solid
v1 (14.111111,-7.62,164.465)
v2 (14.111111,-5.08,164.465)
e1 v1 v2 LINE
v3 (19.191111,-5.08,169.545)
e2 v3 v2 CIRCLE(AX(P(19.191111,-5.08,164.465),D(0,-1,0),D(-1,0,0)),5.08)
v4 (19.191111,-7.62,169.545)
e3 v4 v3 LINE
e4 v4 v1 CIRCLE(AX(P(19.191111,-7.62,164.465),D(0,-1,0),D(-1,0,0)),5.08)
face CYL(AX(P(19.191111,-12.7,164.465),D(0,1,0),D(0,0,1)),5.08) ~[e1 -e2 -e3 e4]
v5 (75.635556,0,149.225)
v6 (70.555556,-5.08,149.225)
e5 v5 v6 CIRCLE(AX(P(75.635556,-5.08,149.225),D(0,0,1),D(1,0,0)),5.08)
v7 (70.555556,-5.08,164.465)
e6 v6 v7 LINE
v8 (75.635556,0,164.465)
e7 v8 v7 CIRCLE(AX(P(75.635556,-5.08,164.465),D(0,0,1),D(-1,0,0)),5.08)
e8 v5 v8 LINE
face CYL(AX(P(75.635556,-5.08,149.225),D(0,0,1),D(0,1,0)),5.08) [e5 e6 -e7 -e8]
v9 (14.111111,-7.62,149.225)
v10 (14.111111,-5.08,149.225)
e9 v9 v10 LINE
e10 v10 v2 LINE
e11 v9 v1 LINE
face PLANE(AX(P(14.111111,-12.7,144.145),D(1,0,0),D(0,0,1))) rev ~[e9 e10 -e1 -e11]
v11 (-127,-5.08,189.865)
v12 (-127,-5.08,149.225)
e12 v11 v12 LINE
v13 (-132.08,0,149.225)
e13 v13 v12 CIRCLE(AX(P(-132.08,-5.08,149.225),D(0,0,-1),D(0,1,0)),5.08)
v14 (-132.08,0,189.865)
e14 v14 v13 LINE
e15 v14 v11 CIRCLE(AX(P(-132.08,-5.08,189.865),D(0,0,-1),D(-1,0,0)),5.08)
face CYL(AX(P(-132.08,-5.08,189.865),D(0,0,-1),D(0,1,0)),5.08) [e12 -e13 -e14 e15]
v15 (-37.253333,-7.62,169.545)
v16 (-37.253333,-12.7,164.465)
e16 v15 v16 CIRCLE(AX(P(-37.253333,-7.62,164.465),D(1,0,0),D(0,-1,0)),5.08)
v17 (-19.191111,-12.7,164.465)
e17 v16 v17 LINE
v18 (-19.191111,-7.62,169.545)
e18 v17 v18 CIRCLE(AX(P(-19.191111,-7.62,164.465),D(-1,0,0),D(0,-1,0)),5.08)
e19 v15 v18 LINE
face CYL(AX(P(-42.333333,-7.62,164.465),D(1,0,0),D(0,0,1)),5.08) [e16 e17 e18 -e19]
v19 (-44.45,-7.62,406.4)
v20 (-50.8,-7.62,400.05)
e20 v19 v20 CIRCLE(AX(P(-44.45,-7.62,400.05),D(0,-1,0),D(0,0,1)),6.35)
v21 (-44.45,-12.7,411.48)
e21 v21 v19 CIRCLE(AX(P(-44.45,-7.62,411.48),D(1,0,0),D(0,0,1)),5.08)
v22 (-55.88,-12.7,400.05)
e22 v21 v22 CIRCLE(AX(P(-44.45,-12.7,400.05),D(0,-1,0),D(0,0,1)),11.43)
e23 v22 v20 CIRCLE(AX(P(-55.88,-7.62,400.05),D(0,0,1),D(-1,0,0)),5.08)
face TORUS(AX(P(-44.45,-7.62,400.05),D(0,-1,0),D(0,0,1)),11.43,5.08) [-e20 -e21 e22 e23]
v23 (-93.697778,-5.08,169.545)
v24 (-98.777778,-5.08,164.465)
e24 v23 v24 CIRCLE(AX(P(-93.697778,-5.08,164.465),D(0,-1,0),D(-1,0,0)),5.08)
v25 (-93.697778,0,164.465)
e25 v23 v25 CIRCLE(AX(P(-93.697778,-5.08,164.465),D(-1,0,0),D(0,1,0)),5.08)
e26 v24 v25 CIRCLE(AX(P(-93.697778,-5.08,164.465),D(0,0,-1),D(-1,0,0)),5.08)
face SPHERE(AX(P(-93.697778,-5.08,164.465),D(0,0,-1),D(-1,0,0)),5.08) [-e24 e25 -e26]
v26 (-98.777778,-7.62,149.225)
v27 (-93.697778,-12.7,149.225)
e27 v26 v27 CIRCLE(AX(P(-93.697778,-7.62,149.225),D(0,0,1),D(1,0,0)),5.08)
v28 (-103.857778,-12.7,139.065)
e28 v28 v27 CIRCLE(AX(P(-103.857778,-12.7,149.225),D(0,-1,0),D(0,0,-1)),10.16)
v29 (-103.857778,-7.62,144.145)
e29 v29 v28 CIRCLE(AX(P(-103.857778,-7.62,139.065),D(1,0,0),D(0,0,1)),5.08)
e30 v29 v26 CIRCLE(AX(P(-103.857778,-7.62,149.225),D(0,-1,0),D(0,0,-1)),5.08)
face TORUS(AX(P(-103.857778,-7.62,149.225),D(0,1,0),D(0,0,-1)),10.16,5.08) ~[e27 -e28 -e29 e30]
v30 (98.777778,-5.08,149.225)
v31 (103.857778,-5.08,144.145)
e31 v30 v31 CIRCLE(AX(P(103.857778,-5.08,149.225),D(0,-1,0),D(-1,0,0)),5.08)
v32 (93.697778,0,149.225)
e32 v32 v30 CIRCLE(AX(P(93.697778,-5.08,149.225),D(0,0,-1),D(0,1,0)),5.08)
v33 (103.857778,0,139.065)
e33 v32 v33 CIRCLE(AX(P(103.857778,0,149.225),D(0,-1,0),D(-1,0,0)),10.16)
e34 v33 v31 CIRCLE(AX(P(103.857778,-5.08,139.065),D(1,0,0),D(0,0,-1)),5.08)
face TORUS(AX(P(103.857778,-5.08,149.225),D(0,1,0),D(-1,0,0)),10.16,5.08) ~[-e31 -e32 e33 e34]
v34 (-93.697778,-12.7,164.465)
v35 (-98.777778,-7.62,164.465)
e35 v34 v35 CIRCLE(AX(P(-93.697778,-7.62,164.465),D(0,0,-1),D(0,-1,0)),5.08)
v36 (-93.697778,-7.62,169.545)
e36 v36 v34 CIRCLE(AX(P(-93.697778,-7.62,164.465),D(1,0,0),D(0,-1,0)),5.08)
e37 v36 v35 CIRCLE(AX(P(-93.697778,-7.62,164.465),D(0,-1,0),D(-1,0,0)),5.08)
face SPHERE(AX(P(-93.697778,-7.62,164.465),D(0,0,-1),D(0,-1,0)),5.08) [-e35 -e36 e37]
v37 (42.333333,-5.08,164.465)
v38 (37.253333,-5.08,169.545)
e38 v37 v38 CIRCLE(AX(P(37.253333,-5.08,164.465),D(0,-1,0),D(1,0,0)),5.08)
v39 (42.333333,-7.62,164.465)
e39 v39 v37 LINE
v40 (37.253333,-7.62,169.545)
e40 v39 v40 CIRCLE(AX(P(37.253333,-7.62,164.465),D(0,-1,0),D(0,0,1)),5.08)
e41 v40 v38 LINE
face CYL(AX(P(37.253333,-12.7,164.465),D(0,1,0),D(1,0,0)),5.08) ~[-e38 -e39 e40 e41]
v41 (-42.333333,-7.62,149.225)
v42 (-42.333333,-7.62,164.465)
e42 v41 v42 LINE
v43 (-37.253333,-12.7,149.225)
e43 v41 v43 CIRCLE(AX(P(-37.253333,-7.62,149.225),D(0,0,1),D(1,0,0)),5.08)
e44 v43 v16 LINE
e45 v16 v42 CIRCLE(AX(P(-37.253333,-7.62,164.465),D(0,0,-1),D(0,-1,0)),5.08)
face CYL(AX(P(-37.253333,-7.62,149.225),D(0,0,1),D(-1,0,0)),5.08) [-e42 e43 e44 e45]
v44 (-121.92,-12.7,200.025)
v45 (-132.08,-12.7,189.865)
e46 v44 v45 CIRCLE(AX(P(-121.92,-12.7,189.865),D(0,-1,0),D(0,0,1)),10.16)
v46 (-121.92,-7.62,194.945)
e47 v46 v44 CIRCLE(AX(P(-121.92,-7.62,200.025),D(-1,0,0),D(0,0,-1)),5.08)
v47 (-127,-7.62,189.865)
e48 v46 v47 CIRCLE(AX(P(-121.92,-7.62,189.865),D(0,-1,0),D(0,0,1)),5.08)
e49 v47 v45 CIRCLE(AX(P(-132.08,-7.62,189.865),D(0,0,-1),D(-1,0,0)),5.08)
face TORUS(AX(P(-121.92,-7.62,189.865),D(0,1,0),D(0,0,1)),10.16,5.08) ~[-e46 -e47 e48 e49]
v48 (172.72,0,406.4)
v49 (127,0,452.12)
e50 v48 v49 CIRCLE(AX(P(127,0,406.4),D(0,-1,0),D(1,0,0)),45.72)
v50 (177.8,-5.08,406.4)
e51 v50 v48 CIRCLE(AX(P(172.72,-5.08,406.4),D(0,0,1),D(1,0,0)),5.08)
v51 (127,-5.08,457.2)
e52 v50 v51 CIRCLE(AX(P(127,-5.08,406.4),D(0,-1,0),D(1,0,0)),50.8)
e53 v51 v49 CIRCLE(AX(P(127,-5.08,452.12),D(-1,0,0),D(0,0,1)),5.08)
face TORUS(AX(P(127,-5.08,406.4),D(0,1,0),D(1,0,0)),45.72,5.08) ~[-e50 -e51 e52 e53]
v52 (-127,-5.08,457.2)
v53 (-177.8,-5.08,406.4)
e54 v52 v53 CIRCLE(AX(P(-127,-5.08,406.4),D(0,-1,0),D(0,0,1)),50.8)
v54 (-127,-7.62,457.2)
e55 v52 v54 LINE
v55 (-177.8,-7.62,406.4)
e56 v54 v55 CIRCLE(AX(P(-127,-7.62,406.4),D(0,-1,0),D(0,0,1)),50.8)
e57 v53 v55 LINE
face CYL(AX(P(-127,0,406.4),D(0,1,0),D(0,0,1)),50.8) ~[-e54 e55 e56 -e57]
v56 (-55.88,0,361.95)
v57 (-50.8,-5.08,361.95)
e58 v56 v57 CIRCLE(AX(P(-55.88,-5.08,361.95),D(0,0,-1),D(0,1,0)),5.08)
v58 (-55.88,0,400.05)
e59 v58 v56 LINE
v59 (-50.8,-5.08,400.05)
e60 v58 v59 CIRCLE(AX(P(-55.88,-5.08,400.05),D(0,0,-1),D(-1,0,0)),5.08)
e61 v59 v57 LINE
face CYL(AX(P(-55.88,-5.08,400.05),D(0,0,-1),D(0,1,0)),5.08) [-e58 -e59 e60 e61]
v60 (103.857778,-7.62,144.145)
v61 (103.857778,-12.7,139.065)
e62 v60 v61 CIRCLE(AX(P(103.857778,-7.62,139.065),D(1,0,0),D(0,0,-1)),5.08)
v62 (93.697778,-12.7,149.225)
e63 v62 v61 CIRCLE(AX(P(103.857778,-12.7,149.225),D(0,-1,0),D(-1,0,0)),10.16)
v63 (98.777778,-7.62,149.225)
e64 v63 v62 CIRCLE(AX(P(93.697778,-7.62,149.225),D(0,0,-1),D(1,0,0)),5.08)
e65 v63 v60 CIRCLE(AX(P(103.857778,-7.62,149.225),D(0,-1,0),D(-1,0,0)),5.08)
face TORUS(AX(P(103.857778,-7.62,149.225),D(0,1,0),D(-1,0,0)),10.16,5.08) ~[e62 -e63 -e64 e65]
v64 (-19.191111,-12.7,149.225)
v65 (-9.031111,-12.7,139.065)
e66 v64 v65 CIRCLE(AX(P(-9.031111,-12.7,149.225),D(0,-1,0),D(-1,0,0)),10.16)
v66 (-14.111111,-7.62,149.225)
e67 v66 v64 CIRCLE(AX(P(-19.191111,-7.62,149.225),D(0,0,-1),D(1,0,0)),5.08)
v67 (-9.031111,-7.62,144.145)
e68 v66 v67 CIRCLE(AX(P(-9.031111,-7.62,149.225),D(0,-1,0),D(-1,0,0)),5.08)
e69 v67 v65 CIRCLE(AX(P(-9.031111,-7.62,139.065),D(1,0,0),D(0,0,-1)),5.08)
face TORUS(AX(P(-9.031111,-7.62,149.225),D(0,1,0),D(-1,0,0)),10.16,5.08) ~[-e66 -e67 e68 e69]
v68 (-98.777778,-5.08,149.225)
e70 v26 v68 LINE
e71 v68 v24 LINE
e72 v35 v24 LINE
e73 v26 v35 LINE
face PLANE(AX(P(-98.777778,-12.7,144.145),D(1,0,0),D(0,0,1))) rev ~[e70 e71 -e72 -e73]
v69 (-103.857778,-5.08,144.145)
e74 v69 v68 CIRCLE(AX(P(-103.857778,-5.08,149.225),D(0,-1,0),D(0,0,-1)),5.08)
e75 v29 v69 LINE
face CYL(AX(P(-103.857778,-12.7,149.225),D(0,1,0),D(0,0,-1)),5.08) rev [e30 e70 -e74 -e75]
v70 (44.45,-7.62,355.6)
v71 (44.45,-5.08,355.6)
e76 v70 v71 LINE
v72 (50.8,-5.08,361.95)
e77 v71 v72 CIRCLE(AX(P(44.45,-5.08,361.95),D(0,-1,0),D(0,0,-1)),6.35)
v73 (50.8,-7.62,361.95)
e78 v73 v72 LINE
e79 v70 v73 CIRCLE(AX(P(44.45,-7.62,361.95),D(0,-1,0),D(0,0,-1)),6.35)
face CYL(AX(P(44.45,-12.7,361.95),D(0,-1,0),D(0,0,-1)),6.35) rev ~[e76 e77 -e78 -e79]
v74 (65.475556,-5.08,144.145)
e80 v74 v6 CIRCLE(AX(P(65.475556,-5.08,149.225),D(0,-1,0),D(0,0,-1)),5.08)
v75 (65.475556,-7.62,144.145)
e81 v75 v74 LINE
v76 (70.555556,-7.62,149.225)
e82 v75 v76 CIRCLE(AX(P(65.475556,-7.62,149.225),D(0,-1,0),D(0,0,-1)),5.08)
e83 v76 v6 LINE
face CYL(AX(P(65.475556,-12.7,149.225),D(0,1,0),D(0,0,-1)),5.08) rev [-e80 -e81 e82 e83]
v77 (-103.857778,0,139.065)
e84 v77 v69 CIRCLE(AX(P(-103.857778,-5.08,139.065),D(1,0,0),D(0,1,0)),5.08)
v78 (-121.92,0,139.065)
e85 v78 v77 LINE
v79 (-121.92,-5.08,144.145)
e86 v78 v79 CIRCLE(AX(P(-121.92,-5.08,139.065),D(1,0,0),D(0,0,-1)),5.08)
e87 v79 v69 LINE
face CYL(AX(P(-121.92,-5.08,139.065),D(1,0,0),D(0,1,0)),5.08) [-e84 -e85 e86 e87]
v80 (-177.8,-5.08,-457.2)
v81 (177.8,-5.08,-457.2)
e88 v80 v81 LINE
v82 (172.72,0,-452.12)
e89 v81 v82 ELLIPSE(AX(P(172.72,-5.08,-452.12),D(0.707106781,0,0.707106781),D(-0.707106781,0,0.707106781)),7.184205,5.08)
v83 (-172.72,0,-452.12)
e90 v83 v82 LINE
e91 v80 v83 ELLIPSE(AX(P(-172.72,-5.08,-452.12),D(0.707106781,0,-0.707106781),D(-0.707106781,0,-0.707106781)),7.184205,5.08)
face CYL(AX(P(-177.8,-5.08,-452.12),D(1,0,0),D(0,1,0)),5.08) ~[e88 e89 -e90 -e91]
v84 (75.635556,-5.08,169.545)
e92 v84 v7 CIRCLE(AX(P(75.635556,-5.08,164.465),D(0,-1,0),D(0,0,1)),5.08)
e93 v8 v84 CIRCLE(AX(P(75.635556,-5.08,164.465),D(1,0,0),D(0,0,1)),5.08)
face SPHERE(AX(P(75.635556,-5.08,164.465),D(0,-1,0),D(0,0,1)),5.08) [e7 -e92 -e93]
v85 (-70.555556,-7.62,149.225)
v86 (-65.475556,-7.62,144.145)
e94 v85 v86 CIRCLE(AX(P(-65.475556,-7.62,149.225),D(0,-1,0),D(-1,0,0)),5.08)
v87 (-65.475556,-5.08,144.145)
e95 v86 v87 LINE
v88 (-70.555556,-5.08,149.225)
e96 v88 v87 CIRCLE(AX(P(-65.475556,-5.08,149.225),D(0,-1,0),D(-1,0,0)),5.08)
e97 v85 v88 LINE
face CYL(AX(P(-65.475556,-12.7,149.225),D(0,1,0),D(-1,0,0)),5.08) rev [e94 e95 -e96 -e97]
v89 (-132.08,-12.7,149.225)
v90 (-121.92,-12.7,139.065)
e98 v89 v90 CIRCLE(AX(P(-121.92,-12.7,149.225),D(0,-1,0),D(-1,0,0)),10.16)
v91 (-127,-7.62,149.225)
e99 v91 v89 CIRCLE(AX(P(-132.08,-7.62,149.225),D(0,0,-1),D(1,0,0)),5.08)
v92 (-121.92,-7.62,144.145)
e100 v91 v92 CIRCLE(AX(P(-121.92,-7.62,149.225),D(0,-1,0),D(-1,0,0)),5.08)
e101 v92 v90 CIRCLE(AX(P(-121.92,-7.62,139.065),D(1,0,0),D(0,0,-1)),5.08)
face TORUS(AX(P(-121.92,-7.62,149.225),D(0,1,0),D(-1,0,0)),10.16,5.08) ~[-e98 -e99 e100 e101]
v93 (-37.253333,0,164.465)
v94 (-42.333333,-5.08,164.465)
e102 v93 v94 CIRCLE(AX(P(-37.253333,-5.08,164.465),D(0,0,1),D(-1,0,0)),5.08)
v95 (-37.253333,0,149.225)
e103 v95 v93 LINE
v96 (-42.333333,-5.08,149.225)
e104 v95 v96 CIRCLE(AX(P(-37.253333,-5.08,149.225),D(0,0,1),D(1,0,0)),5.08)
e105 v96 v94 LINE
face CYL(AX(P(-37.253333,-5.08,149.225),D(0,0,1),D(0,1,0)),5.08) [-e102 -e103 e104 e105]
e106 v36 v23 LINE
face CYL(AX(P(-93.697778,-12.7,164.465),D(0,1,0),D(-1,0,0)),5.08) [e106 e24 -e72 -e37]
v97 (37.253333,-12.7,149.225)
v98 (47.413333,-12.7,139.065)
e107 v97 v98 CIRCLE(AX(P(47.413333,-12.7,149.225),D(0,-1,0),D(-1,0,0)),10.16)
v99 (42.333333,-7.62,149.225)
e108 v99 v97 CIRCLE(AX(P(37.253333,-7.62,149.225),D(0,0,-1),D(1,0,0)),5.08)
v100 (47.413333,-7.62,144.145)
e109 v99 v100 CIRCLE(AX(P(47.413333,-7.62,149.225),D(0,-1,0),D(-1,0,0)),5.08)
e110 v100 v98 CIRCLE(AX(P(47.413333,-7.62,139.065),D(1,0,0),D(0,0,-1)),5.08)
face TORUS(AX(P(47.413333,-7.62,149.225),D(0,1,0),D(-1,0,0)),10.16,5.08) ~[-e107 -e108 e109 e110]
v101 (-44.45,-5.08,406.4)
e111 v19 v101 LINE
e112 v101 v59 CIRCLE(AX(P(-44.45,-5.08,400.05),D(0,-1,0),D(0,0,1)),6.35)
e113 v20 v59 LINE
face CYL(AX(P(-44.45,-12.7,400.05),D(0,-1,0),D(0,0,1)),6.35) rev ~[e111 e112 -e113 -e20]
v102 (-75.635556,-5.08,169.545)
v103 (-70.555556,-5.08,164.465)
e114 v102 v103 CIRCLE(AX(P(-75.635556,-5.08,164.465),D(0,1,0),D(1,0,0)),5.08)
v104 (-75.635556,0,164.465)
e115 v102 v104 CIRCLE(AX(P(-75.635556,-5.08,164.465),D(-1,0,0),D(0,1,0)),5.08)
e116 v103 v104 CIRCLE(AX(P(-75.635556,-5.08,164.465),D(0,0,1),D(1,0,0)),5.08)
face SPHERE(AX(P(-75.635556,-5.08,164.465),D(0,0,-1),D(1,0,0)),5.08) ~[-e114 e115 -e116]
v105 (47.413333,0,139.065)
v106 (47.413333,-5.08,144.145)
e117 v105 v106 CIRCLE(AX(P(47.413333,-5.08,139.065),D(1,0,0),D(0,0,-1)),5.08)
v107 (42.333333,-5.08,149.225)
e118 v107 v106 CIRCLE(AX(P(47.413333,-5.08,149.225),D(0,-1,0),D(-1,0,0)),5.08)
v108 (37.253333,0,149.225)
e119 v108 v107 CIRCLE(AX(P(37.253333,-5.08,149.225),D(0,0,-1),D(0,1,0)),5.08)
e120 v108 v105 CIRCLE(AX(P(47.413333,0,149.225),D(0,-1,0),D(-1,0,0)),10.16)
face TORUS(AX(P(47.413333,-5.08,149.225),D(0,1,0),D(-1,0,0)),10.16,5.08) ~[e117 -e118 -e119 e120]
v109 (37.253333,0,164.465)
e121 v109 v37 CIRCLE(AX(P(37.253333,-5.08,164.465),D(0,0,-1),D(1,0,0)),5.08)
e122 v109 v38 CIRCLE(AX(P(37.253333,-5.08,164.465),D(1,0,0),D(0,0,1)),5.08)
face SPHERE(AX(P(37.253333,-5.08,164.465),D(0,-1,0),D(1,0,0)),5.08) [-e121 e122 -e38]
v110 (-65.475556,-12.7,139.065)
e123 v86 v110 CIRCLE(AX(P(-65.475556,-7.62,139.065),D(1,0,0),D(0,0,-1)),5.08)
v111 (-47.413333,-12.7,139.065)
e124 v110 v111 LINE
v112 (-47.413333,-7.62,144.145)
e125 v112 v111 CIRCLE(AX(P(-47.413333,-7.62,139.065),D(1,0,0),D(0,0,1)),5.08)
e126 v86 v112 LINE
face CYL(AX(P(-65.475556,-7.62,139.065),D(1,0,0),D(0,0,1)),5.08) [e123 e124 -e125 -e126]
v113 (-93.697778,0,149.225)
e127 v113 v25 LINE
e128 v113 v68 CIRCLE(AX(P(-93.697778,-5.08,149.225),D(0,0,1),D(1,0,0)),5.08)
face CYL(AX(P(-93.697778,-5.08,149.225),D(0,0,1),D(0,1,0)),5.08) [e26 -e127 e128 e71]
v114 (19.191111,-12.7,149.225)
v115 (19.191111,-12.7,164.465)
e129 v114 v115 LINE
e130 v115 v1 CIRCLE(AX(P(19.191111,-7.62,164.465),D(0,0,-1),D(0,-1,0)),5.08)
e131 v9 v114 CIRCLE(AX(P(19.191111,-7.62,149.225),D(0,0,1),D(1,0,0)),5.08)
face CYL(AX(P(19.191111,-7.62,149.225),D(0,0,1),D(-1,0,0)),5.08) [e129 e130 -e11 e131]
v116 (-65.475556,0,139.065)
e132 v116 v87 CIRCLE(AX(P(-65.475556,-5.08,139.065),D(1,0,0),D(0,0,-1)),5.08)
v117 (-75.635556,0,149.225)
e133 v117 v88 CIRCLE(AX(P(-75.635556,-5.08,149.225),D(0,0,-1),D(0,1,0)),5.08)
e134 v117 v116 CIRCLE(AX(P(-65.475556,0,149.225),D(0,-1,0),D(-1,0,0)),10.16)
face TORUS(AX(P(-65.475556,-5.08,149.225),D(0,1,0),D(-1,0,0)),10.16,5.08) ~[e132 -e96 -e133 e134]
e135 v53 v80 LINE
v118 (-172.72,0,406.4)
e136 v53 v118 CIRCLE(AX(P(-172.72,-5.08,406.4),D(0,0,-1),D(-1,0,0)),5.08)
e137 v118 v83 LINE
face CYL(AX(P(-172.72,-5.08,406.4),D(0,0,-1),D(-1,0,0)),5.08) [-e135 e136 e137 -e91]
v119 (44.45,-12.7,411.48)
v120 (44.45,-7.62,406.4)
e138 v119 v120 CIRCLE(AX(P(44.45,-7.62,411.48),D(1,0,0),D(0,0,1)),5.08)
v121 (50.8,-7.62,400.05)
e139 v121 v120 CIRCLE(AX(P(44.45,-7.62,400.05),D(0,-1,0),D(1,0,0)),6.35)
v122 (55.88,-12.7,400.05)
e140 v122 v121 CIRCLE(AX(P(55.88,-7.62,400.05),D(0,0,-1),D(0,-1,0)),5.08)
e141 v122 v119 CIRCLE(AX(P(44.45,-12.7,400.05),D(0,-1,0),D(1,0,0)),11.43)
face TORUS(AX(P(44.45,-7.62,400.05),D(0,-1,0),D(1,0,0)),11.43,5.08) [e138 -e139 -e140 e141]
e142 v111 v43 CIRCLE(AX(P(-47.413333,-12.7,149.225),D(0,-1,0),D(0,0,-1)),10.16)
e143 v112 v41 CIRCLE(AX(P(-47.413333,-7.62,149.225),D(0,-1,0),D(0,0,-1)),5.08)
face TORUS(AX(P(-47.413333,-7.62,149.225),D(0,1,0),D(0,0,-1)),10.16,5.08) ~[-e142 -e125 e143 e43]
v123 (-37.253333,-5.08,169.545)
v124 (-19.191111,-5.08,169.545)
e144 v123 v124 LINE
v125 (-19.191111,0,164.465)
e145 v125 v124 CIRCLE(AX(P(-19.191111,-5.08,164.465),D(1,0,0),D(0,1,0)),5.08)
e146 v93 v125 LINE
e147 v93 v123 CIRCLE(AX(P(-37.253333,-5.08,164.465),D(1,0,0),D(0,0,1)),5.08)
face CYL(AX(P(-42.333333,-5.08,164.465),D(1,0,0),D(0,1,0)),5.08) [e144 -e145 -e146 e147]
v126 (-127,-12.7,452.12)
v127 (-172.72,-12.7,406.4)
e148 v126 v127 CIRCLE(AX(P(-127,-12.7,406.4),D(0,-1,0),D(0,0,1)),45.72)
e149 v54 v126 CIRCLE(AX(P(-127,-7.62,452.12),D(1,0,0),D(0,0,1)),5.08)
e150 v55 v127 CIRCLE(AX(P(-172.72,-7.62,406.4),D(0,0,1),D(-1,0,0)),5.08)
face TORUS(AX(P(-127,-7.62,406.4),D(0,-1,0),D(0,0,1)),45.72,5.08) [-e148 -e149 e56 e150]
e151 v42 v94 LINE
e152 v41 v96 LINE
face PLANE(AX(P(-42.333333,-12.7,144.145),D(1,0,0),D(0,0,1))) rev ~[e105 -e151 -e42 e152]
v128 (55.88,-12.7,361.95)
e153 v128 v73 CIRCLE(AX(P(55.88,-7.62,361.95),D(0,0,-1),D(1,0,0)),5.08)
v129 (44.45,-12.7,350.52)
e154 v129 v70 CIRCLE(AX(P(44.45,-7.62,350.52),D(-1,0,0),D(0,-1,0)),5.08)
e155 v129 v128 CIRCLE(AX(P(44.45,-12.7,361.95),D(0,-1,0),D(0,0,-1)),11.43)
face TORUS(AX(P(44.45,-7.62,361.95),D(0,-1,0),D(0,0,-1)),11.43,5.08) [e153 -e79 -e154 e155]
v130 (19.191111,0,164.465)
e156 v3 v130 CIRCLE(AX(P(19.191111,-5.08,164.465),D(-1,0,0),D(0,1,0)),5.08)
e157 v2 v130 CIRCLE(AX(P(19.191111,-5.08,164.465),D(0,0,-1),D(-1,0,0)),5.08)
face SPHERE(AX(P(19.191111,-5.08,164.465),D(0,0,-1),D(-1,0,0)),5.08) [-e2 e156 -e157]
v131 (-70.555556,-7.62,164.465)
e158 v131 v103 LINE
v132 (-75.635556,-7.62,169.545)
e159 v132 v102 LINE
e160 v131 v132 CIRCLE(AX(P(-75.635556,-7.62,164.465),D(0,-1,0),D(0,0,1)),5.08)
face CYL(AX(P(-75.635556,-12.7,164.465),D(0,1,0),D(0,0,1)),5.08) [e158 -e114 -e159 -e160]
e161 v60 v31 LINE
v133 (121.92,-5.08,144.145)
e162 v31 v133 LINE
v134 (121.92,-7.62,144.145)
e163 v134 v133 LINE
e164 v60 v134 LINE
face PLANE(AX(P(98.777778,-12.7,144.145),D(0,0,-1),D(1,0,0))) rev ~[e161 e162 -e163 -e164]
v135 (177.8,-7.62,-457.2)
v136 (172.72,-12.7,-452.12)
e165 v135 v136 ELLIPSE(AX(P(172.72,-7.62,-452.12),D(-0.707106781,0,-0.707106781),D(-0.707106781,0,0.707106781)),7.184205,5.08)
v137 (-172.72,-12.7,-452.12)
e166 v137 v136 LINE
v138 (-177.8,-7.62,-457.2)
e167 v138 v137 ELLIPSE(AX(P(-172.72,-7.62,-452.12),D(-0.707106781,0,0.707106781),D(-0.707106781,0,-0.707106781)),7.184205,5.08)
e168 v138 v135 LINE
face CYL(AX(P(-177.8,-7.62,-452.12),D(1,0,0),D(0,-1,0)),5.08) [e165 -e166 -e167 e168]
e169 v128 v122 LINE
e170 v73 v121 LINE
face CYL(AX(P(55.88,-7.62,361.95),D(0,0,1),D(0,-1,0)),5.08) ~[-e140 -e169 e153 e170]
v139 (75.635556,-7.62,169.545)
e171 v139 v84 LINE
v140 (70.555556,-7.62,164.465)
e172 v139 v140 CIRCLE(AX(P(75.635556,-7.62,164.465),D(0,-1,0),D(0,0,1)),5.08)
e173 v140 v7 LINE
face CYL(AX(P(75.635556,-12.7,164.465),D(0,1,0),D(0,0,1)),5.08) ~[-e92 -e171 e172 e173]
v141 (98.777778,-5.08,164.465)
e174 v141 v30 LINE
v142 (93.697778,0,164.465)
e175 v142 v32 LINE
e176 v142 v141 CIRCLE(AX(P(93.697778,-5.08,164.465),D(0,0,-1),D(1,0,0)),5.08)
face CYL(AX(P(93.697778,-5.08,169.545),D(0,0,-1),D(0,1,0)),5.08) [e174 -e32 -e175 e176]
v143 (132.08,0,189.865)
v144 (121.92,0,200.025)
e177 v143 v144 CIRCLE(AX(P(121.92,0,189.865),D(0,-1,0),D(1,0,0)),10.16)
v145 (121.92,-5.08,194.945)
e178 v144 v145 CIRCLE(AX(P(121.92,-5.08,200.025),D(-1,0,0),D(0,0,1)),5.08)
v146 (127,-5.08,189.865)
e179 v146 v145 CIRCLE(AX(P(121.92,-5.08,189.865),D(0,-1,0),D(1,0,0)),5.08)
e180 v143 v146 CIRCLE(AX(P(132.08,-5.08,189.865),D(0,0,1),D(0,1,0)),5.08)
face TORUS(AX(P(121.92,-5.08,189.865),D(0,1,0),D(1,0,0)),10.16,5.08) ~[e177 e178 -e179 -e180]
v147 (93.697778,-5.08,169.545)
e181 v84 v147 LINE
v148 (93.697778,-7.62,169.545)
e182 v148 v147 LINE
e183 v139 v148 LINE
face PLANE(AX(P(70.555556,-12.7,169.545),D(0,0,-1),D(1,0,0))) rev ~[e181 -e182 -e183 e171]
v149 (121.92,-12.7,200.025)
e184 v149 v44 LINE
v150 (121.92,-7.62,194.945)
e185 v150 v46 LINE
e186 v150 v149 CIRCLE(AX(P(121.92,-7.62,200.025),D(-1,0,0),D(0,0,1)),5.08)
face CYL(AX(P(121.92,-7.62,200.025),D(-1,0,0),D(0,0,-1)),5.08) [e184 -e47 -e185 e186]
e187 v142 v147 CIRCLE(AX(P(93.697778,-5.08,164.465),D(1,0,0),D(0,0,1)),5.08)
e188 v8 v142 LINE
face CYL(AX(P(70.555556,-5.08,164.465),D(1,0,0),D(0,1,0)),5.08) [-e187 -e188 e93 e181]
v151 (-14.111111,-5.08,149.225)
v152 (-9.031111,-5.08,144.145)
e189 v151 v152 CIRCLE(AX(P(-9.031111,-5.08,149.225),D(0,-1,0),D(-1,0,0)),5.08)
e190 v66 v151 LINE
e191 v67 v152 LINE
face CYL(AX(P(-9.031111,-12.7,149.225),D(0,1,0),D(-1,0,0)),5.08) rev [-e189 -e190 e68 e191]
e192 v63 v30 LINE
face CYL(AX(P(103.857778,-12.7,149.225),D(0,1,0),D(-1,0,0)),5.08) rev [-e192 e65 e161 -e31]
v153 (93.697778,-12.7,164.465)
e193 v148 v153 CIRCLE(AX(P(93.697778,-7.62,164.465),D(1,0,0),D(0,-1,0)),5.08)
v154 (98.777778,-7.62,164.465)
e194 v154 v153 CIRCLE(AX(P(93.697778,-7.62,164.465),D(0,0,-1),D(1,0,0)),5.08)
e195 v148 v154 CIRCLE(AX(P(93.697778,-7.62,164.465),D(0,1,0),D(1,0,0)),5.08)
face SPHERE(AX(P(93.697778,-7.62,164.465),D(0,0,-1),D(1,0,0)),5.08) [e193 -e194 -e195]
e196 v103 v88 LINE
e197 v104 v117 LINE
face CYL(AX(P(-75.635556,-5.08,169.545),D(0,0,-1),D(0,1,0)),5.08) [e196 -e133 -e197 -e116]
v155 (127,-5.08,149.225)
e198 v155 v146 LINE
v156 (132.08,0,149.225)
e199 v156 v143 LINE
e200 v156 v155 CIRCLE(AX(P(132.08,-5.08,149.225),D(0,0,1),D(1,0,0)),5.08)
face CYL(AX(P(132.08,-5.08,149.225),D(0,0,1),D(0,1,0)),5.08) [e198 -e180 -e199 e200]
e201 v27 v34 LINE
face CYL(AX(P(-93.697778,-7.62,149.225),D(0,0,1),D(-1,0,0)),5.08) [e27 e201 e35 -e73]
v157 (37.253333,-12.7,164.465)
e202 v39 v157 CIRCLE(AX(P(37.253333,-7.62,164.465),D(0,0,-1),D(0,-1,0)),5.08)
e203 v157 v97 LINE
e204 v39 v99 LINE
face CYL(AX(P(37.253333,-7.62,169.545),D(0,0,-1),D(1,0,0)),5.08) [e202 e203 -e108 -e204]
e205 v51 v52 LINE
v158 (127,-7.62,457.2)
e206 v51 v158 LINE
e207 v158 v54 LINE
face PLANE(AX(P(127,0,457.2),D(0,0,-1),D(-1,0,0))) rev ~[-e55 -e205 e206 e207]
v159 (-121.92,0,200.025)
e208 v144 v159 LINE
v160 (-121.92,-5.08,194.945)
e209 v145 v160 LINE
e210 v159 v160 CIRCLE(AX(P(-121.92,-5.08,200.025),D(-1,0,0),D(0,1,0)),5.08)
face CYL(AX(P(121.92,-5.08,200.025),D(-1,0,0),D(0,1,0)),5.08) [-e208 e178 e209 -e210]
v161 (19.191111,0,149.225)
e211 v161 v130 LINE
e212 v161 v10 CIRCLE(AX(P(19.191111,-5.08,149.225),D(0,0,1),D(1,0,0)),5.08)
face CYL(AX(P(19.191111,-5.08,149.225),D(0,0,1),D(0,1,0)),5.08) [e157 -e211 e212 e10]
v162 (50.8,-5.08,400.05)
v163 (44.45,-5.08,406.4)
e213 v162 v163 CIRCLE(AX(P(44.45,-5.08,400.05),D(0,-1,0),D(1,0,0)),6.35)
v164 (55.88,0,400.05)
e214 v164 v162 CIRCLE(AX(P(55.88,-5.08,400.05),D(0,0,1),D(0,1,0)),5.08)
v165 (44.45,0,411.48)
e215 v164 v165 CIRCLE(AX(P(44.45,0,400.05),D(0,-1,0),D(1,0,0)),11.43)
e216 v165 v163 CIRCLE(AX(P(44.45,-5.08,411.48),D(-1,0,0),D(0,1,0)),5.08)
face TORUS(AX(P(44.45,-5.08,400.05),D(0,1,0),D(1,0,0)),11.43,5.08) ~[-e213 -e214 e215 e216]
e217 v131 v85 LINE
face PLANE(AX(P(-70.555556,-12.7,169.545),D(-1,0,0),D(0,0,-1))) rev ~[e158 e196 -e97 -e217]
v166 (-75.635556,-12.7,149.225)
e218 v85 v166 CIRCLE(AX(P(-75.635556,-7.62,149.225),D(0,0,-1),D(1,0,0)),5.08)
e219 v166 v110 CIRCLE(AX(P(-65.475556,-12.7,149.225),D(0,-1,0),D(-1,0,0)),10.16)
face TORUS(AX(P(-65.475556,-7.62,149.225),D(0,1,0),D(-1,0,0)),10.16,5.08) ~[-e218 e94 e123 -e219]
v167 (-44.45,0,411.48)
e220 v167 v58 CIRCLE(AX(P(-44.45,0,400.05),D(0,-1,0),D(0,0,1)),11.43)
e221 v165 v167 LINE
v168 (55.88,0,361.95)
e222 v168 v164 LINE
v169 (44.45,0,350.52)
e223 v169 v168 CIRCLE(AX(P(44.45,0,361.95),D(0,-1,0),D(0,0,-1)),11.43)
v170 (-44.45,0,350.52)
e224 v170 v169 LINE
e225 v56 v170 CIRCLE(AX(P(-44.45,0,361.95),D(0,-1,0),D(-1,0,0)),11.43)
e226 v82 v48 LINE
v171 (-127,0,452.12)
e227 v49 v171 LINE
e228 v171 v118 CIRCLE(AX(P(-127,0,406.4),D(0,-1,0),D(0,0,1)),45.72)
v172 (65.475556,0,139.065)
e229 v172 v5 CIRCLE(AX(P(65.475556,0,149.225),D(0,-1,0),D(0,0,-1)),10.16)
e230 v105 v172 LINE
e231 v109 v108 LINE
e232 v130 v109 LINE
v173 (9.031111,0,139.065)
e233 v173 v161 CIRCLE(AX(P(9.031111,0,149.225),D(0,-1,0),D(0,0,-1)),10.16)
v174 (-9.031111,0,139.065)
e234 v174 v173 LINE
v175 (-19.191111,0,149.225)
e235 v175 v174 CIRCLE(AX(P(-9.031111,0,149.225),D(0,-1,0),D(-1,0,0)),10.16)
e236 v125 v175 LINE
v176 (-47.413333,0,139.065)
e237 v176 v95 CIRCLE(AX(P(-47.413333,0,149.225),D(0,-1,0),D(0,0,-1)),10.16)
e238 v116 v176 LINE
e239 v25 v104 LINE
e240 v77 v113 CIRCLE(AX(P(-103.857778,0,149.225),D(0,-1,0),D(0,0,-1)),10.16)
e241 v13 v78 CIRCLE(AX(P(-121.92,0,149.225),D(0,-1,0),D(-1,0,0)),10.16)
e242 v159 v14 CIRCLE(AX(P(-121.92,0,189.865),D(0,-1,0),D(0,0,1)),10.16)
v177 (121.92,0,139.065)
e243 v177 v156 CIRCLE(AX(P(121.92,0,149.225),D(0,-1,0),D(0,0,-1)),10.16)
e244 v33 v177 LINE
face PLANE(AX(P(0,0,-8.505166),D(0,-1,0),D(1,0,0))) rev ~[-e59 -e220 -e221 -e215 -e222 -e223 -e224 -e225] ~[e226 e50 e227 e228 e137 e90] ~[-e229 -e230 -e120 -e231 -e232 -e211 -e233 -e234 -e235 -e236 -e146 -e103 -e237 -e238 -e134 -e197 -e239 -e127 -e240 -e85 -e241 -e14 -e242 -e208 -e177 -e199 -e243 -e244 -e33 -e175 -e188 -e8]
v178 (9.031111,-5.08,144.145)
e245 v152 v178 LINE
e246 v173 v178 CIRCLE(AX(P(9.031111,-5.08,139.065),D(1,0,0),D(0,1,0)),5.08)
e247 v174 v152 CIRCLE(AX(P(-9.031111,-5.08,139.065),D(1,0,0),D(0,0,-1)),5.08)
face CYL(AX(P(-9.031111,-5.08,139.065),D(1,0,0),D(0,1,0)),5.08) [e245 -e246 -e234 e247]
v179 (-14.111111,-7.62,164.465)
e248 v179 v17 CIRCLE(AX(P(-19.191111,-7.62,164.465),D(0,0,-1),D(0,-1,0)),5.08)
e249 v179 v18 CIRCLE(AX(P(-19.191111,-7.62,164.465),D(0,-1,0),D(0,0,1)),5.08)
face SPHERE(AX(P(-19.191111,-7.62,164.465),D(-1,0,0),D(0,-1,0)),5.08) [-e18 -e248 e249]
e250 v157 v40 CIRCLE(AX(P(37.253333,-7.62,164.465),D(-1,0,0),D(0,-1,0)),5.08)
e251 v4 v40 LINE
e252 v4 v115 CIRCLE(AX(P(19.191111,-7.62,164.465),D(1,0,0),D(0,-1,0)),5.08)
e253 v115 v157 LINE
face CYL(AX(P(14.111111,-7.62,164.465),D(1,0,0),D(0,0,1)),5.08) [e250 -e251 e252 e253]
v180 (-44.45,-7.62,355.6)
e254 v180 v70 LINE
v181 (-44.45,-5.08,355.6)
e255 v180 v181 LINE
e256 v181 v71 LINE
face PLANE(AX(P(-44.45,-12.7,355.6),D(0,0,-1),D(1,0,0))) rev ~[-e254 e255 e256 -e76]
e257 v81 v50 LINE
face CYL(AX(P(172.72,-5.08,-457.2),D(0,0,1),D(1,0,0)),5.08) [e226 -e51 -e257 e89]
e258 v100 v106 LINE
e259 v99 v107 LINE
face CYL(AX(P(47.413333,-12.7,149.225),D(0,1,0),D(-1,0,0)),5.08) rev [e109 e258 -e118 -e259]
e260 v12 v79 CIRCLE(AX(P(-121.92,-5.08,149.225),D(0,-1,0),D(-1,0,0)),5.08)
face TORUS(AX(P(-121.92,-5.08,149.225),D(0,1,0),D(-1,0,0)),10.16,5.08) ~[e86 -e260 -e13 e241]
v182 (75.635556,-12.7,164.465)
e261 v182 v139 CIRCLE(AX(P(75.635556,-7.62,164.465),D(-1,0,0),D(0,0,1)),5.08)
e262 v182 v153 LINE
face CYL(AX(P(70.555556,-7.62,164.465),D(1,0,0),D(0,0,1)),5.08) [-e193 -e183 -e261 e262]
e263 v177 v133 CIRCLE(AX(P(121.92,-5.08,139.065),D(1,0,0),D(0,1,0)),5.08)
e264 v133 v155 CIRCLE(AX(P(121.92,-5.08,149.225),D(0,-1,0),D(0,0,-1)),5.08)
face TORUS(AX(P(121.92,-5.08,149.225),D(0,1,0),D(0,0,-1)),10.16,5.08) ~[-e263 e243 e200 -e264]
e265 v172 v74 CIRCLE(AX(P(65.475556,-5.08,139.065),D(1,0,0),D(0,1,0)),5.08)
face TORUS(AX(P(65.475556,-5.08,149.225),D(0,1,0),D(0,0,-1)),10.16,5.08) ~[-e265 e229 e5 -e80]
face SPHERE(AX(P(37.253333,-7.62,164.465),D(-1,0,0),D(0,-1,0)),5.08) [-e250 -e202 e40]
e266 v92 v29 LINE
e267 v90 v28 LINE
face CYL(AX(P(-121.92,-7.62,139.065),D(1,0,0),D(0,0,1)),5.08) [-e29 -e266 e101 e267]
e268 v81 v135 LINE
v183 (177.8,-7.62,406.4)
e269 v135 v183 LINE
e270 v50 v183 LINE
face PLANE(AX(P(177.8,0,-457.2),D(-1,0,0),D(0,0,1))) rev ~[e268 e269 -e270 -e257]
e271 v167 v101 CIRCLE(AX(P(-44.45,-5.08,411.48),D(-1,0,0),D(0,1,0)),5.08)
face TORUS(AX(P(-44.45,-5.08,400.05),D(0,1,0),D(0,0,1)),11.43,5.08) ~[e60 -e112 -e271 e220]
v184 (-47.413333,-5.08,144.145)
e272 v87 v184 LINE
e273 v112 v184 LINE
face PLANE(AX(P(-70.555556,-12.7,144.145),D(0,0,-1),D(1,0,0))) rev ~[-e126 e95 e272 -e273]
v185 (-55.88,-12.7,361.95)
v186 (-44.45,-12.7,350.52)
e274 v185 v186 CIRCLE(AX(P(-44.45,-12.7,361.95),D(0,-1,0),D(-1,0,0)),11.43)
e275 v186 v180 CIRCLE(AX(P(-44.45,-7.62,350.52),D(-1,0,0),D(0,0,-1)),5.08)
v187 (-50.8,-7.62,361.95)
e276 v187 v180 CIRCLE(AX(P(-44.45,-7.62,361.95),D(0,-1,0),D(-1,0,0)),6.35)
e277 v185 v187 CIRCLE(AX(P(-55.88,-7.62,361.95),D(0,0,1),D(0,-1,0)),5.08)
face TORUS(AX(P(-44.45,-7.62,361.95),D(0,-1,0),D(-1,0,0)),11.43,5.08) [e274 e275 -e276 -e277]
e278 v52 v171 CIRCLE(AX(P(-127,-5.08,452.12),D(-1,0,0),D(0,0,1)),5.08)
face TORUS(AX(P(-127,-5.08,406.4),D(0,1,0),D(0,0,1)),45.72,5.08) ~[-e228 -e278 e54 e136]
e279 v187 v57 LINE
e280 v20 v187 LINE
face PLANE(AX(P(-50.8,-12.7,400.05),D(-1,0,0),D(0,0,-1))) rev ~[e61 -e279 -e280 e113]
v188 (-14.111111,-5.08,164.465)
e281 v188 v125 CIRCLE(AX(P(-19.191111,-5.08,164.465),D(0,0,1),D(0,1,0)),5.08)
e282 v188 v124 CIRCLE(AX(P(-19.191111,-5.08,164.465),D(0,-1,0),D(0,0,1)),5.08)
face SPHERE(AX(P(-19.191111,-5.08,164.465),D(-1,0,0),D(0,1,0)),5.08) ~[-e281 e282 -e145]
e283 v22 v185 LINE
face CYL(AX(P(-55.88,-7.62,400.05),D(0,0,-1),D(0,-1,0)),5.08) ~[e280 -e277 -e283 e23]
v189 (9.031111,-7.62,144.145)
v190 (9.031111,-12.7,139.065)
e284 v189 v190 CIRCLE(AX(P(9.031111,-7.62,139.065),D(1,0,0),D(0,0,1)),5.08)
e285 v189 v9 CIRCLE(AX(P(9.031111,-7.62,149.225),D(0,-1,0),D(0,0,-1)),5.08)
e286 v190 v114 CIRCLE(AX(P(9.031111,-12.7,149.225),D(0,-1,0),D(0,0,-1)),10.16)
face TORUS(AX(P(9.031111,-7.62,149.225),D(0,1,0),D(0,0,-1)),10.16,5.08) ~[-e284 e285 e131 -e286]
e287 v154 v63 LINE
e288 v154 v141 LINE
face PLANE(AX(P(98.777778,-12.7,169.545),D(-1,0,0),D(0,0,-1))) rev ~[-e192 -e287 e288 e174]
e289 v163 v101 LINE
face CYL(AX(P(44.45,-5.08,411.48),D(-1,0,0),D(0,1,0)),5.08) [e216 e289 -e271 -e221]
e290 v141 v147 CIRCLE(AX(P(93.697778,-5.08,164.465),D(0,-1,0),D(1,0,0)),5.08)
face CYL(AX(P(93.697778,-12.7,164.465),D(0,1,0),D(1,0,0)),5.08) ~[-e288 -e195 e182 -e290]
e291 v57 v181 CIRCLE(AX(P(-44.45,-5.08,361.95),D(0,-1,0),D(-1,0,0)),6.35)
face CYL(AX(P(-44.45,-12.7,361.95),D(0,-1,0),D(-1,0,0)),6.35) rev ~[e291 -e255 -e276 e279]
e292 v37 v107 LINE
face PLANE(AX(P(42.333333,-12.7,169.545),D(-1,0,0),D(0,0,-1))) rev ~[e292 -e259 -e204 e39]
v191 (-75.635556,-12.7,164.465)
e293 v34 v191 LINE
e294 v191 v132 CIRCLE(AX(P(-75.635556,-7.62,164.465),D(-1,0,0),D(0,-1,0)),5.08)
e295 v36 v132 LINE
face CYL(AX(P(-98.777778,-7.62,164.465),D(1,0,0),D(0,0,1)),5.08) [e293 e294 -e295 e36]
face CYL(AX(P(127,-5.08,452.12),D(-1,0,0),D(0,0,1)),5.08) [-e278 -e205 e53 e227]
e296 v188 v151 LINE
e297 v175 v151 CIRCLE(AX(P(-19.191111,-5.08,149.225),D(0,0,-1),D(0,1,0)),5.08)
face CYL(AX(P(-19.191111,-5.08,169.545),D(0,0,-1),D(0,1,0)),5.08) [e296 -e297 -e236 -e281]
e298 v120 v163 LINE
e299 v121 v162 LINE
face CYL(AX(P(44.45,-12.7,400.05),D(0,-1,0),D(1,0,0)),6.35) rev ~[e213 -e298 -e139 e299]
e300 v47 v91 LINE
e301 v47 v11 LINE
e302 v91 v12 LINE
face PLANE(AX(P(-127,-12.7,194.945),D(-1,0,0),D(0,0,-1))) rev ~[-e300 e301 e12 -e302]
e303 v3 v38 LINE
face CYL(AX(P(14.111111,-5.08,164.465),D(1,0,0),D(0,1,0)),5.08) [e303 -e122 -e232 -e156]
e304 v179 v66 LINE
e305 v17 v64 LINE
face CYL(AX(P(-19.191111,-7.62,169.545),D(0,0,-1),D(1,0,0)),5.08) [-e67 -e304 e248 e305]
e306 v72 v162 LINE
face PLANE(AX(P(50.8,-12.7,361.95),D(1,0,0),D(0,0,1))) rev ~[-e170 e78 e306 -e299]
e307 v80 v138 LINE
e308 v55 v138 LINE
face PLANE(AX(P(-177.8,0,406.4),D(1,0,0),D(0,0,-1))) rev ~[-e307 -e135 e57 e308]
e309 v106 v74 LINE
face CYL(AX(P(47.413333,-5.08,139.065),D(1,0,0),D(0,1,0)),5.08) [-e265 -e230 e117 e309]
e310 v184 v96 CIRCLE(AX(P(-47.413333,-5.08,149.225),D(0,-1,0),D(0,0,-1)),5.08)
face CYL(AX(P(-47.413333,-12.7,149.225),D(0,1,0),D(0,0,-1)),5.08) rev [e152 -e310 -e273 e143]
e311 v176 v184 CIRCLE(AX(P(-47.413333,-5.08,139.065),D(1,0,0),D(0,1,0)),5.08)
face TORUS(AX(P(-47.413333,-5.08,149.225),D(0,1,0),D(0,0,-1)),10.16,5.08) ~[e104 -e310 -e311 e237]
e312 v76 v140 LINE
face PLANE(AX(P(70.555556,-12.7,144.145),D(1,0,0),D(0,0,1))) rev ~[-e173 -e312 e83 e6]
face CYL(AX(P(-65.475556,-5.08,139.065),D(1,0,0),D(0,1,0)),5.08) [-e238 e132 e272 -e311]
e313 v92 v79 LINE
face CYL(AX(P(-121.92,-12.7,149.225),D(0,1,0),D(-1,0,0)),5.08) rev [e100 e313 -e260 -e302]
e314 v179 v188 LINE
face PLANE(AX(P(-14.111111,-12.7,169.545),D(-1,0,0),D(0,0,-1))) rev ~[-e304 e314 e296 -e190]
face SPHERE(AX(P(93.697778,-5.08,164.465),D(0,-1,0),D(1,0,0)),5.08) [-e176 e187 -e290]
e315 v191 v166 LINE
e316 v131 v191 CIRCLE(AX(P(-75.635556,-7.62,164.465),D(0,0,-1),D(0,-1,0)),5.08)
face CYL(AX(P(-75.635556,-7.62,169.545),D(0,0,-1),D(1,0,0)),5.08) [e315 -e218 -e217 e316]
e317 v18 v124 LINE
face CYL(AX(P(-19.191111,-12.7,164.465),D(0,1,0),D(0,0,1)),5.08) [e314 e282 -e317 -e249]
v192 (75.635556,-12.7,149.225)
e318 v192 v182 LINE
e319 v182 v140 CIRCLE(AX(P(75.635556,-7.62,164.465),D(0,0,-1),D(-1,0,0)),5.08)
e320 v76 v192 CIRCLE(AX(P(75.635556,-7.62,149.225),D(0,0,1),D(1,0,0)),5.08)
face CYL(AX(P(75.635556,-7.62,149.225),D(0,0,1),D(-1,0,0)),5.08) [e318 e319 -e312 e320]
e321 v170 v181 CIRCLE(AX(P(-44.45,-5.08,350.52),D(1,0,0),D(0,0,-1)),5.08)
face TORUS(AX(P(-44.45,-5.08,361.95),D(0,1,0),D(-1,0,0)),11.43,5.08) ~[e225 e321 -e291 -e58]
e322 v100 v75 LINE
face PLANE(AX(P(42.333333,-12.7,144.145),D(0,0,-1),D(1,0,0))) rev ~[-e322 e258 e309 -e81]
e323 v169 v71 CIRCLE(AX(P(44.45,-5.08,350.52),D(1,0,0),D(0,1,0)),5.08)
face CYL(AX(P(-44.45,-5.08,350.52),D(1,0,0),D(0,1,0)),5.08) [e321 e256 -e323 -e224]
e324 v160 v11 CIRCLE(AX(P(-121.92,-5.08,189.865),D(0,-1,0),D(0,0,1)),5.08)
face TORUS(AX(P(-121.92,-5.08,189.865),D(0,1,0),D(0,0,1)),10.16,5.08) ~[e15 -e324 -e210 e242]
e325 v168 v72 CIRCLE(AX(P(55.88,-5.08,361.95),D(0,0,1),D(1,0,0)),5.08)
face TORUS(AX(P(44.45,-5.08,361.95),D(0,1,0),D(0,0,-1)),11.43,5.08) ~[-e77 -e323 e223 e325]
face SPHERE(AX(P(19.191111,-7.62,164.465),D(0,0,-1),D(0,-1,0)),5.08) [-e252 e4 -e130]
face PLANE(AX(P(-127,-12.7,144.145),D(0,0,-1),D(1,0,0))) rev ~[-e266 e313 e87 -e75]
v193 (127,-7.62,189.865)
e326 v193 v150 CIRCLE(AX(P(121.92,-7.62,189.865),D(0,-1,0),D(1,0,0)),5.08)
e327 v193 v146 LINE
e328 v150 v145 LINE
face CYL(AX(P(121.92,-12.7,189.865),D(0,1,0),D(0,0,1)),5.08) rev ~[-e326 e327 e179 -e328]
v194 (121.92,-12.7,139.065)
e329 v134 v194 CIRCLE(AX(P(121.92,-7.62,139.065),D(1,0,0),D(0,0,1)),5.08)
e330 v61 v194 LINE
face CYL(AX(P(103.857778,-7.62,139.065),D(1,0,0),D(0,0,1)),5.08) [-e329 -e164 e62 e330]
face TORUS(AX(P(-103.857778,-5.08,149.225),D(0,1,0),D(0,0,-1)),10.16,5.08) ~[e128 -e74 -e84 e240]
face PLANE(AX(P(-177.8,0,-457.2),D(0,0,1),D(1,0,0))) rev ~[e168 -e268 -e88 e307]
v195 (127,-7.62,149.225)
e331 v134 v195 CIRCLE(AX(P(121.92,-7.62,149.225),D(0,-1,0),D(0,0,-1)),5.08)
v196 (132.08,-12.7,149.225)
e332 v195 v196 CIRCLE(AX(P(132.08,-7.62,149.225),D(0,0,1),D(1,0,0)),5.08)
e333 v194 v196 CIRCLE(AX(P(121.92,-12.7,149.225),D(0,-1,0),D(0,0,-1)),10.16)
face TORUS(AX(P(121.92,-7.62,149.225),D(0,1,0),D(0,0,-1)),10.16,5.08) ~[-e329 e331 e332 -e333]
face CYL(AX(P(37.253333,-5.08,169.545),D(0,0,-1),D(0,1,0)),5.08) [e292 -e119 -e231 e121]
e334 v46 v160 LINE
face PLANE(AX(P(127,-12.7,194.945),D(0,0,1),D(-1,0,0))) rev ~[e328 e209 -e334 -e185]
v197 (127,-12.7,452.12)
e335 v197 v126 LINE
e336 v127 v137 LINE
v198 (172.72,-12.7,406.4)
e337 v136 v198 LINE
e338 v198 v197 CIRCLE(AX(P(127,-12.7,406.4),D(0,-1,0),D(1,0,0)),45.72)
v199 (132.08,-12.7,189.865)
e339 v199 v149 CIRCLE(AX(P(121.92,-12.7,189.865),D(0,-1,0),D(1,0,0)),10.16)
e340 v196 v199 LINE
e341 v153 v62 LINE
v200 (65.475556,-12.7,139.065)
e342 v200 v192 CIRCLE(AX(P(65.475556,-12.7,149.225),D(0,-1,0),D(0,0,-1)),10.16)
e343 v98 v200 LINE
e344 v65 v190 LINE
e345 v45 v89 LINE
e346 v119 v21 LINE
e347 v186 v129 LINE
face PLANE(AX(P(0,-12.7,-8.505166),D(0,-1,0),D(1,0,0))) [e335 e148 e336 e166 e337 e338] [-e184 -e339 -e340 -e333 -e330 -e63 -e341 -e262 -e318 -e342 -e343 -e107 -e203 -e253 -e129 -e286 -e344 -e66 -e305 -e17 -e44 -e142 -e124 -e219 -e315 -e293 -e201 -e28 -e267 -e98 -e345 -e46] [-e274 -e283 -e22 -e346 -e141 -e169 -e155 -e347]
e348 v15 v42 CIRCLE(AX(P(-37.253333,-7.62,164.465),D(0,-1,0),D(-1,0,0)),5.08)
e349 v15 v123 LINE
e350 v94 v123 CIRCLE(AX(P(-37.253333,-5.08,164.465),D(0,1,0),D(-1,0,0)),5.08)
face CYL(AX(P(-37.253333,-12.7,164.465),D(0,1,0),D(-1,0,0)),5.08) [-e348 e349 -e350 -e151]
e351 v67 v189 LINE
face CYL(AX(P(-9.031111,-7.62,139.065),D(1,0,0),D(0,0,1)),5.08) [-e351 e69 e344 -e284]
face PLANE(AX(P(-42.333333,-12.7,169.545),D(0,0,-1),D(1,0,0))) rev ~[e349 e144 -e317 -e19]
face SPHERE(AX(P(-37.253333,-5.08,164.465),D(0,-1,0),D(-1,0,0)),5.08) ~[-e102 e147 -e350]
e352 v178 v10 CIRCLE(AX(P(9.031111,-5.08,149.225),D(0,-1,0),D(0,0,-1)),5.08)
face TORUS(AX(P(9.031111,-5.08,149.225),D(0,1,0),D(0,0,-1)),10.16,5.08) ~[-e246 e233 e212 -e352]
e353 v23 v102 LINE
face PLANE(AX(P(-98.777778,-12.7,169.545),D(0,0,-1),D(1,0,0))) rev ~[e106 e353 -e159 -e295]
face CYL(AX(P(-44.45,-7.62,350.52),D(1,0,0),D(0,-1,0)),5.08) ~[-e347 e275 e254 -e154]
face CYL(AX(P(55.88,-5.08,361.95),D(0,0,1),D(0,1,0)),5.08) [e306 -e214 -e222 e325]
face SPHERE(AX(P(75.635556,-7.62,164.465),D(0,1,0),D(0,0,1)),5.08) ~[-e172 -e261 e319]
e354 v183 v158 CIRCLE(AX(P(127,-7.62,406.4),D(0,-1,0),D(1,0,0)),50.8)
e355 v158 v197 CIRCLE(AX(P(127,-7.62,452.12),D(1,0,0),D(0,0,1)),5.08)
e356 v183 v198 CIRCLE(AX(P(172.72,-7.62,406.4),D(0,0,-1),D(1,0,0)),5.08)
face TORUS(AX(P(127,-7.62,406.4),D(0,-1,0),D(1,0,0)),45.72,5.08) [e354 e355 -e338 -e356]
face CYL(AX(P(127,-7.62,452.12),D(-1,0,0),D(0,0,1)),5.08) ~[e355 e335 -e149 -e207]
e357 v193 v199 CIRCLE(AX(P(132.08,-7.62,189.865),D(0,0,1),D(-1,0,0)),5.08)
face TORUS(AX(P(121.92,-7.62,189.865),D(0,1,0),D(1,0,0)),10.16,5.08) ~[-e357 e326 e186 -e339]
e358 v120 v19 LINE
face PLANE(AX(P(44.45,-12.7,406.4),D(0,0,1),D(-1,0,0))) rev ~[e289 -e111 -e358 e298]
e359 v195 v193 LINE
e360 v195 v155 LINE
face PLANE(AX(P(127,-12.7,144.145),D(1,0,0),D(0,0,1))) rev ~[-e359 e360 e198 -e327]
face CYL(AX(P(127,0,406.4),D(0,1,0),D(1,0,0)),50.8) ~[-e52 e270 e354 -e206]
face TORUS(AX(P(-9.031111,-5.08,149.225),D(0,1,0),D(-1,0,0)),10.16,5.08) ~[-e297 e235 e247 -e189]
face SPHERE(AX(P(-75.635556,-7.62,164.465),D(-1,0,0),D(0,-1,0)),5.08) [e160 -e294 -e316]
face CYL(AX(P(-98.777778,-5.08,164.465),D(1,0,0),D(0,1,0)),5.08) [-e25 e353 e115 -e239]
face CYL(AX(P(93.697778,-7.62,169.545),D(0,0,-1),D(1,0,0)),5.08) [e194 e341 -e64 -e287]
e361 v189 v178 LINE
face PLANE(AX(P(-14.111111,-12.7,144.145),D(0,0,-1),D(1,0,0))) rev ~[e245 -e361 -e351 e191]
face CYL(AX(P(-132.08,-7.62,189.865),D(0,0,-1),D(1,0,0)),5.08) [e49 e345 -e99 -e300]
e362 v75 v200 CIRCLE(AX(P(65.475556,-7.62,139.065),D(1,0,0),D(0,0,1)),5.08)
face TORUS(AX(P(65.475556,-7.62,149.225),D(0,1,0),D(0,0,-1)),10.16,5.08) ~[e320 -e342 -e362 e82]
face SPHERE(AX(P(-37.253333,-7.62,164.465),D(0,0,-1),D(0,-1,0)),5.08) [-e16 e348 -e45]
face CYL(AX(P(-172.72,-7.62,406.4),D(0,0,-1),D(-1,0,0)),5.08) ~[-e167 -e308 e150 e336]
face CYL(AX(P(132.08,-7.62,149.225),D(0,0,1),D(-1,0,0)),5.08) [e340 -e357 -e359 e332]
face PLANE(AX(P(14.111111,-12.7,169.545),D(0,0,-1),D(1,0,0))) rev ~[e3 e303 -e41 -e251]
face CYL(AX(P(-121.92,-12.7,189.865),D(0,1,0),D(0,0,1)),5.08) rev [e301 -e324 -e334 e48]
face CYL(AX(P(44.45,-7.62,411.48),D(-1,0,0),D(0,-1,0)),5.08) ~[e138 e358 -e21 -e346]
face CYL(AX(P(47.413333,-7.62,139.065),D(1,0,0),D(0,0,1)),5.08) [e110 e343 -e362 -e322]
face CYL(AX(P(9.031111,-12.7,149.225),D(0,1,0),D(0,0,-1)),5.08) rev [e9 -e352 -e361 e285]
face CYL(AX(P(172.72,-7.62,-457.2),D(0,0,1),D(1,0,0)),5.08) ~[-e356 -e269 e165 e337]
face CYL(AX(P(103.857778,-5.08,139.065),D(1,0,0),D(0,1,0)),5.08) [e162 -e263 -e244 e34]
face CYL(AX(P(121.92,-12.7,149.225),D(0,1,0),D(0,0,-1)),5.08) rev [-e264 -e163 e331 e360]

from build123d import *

# Parameters (mm, degrees)
F1_DEPTH = 12.7
F3_DEPTH = 25.4
F4_R     = 5.08
F5_R     = 5.08
F7_DEPTH = 25.4
F8_F1_R  = 5.08
F8_F2_R  = 5.08


with BuildPart() as f1:
    # F0 (on Front) → F1 (new body)
    with BuildSketch(Plane.XZ):
        with BuildLine():
            ThreePointArc((177.8, 406.4), (162.9210244843, 442.3210244843), (127, 457.2))
            Line((127, 457.2), (-127, 457.2))
            ThreePointArc((-127, 457.2), (-162.9210244843, 442.3210244843), (-177.8, 406.4))
            Line((-177.8, 406.4), (-177.8, -457.2))
            Line((-177.8, -457.2), (177.8, -457.2))
            Line((177.8, -457.2), (177.8, 406.4))
        make_face()
    extrude(amount=F1_DEPTH)

    # F2 (on face) → F3 (cut)
    with BuildSketch(Plane.XZ.offset(12.7)):
        with BuildLine():
            Line((44.45, 406.4), (0, 406.4))
            Line((0, 406.4), (-44.45, 406.4))
            ThreePointArc((-44.45, 406.4), (-48.9401280605, 404.5401280605), (-50.8, 400.05))
            Line((-50.8, 400.05), (-50.8, 361.95))
            ThreePointArc((-50.8, 361.95), (-48.9401280605, 357.4598719395), (-44.45, 355.6))
            Line((-44.45, 355.6), (44.45, 355.6))
            ThreePointArc((44.45, 355.6), (48.9401280605, 357.4598719395), (50.8, 361.95))
            Line((50.8, 361.95), (50.8, 400.05))
            ThreePointArc((50.8, 400.05), (48.9401280605, 404.5401280605), (44.45, 406.4))
        make_face()
    extrude(amount=-F3_DEPTH, mode=Mode.SUBTRACT)

    # F4
    f4_edges = [f1.edges().sort_by_distance(p)[0] for p in [
        (162.921024, -12.7, 442.321024),
        (177.8, -12.7, -25.4),
        (0, -12.7, 457.2),
        (0, -12.7, -457.2),
        (-162.921024, -12.7, 442.321024),
        (-177.8, -12.7, -25.4),
        (-48.940128, -12.7, 404.540128),
        (-50.8, -12.7, 381),
        (-48.940128, -12.7, 357.459872),
        (0, -12.7, 355.6),
        (48.940128, -12.7, 357.459872),
        (50.8, -12.7, 381),
        (48.940128, -12.7, 404.540128),
        (0, -12.7, 406.4),
    ]]
    fillet(f4_edges, radius=F4_R)

    # F5
    f5_edges = [f1.edges().sort_by_distance(p)[0] for p in [
        (162.921024, 0, 442.321024),
        (177.8, 0, -25.4),
        (0, 0, 457.2),
        (0, 0, -457.2),
        (-162.921024, 0, 442.321024),
        (-177.8, 0, -25.4),
        (0, 0, 406.4),
        (-48.940128, 0, 404.540128),
        (-50.8, 0, 381),
        (-48.940128, 0, 357.459872),
        (0, 0, 355.6),
        (48.940128, 0, 357.459872),
        (50.8, 0, 381),
        (48.940128, 0, 404.540128),
    ]]
    fillet(f5_edges, radius=F5_R)

    # F6 (on face) → F7 (cut)
    with BuildSketch(Plane.XZ.offset(12.7)):
        Polygon((127, 194.945), (0, 194.945), (-127, 194.945), (-127, 144.145), (-98.7777777778, 144.145), (-98.7777777778, 169.545), (-70.5555555556, 169.545), (-70.5555555556, 144.145), (-42.3333333333, 144.145), (-42.3333333333, 169.545), (-14.1111111111, 169.545), (-14.1111111111, 144.145), (14.1111110829, 144.145), (14.1111110829, 169.545), (42.3333333048, 169.545), (42.3333333048, 144.145), (70.5555555242, 144.145), (70.5555555242, 169.545), (98.7777777436, 169.545), (98.7777777436, 144.145), (127, 144.145), align=None)
    extrude(amount=-F7_DEPTH, mode=Mode.SUBTRACT)

    # F8: fillet of radius 5.08 on 52 edges, made by hand

    # F8_f1
    f8_f1_edges = [f1.edges().sort_by_distance(p)[0] for p in [
        (-127, -6.35, 194.945),
        (-127, -6.35, 144.145),
        (98.7777777436, -6.35, 144.145),
        (70.5555555242, -6.35, 144.145),
        (-98.7777777778, -6.35, 144.145),
        (14.1111110829, -6.35, 144.145),
        (42.3333333048, -6.35, 144.145),
        (-14.1111111111, -6.35, 144.145),
        (127, -6.35, 144.145),
        (127, -6.35, 194.945),
        (-70.5555555556, -6.35, 144.145),
        (-42.3333333333, -6.35, 144.145),
    ]]
    fillet(f8_f1_edges, radius=F8_F1_R)

    # F8_f2
    f8_f2_edges = [f1.edges().sort_by_distance(p)[0] for p in [
        (-98.7777777778, -12.7, 159.385),
        (-84.6666666667, -12.7, 169.545),
        (-70.5555555556, -12.7, 159.385),
        (-42.3333333333, -12.7, 159.385),
        (-28.2222222222, -12.7, 169.545),
        (-14.1111111111, -12.7, 159.385),
        (14.1111110829, -12.7, 159.385),
        (28.2222221938, -12.7, 169.545),
        (-42.3333333333, -6.35, 169.545),
        (98.7777777436, -6.35, 169.545),
        (70.5555555242, -6.35, 169.545),
        (84.6666666339, -12.7, 169.545),
        (70.5555555242, -12.7, 159.385),
        (-98.7777777778, 0, 159.385),
        (-70.5555555556, 0, 159.385),
        (-42.3333333333, 0, 159.385),
        (42.3333333048, -12.7, 159.385),
        (-28.2222222222, 0, 169.545),
        (14.1111110829, 0, 159.385),
        (-14.1111111111, -6.35, 169.545),
        (-98.7777777778, -6.35, 169.545),
        (-70.5555555556, -6.35, 169.545),
        (14.1111110829, -6.35, 169.545),
        (84.6666666339, 0, 169.545),
        (42.3333333048, -6.35, 169.545),
        (70.5555555242, 0, 159.385),
        (-84.6666666667, 0, 169.545),
        (-14.1111111111, 0, 159.385),
        (28.2222221938, 0, 169.545),
        (42.3333333048, 0, 159.385),
        (43.8212308564, 0, 145.6328975516),
        (-12.6232135596, 0, 145.6328975516),
        (69.0676579726, 0, 145.6328975516),
        (12.6232135313, 0, 145.6328975516),
        (43.8212308564, -12.7, 145.6328975516),
        (-43.8212308849, 0, 145.6328975516),
        (-69.067658004, 0, 145.6328975516),
        (-100.2656753294, 0, 145.6328975516),
        (69.0676579726, -12.7, 145.6328975516),
        (12.6232135313, -12.7, 145.6328975516),
        (-12.6232135596, -12.7, 145.6328975516),
        (-43.8212308849, -12.7, 145.6328975516),
        (-69.067658004, -12.7, 145.6328975516),
        (-100.2656753294, -12.7, 145.6328975516),
    ]]
    fillet(f8_f2_edges, radius=F8_F2_R)


solid = f1.part
